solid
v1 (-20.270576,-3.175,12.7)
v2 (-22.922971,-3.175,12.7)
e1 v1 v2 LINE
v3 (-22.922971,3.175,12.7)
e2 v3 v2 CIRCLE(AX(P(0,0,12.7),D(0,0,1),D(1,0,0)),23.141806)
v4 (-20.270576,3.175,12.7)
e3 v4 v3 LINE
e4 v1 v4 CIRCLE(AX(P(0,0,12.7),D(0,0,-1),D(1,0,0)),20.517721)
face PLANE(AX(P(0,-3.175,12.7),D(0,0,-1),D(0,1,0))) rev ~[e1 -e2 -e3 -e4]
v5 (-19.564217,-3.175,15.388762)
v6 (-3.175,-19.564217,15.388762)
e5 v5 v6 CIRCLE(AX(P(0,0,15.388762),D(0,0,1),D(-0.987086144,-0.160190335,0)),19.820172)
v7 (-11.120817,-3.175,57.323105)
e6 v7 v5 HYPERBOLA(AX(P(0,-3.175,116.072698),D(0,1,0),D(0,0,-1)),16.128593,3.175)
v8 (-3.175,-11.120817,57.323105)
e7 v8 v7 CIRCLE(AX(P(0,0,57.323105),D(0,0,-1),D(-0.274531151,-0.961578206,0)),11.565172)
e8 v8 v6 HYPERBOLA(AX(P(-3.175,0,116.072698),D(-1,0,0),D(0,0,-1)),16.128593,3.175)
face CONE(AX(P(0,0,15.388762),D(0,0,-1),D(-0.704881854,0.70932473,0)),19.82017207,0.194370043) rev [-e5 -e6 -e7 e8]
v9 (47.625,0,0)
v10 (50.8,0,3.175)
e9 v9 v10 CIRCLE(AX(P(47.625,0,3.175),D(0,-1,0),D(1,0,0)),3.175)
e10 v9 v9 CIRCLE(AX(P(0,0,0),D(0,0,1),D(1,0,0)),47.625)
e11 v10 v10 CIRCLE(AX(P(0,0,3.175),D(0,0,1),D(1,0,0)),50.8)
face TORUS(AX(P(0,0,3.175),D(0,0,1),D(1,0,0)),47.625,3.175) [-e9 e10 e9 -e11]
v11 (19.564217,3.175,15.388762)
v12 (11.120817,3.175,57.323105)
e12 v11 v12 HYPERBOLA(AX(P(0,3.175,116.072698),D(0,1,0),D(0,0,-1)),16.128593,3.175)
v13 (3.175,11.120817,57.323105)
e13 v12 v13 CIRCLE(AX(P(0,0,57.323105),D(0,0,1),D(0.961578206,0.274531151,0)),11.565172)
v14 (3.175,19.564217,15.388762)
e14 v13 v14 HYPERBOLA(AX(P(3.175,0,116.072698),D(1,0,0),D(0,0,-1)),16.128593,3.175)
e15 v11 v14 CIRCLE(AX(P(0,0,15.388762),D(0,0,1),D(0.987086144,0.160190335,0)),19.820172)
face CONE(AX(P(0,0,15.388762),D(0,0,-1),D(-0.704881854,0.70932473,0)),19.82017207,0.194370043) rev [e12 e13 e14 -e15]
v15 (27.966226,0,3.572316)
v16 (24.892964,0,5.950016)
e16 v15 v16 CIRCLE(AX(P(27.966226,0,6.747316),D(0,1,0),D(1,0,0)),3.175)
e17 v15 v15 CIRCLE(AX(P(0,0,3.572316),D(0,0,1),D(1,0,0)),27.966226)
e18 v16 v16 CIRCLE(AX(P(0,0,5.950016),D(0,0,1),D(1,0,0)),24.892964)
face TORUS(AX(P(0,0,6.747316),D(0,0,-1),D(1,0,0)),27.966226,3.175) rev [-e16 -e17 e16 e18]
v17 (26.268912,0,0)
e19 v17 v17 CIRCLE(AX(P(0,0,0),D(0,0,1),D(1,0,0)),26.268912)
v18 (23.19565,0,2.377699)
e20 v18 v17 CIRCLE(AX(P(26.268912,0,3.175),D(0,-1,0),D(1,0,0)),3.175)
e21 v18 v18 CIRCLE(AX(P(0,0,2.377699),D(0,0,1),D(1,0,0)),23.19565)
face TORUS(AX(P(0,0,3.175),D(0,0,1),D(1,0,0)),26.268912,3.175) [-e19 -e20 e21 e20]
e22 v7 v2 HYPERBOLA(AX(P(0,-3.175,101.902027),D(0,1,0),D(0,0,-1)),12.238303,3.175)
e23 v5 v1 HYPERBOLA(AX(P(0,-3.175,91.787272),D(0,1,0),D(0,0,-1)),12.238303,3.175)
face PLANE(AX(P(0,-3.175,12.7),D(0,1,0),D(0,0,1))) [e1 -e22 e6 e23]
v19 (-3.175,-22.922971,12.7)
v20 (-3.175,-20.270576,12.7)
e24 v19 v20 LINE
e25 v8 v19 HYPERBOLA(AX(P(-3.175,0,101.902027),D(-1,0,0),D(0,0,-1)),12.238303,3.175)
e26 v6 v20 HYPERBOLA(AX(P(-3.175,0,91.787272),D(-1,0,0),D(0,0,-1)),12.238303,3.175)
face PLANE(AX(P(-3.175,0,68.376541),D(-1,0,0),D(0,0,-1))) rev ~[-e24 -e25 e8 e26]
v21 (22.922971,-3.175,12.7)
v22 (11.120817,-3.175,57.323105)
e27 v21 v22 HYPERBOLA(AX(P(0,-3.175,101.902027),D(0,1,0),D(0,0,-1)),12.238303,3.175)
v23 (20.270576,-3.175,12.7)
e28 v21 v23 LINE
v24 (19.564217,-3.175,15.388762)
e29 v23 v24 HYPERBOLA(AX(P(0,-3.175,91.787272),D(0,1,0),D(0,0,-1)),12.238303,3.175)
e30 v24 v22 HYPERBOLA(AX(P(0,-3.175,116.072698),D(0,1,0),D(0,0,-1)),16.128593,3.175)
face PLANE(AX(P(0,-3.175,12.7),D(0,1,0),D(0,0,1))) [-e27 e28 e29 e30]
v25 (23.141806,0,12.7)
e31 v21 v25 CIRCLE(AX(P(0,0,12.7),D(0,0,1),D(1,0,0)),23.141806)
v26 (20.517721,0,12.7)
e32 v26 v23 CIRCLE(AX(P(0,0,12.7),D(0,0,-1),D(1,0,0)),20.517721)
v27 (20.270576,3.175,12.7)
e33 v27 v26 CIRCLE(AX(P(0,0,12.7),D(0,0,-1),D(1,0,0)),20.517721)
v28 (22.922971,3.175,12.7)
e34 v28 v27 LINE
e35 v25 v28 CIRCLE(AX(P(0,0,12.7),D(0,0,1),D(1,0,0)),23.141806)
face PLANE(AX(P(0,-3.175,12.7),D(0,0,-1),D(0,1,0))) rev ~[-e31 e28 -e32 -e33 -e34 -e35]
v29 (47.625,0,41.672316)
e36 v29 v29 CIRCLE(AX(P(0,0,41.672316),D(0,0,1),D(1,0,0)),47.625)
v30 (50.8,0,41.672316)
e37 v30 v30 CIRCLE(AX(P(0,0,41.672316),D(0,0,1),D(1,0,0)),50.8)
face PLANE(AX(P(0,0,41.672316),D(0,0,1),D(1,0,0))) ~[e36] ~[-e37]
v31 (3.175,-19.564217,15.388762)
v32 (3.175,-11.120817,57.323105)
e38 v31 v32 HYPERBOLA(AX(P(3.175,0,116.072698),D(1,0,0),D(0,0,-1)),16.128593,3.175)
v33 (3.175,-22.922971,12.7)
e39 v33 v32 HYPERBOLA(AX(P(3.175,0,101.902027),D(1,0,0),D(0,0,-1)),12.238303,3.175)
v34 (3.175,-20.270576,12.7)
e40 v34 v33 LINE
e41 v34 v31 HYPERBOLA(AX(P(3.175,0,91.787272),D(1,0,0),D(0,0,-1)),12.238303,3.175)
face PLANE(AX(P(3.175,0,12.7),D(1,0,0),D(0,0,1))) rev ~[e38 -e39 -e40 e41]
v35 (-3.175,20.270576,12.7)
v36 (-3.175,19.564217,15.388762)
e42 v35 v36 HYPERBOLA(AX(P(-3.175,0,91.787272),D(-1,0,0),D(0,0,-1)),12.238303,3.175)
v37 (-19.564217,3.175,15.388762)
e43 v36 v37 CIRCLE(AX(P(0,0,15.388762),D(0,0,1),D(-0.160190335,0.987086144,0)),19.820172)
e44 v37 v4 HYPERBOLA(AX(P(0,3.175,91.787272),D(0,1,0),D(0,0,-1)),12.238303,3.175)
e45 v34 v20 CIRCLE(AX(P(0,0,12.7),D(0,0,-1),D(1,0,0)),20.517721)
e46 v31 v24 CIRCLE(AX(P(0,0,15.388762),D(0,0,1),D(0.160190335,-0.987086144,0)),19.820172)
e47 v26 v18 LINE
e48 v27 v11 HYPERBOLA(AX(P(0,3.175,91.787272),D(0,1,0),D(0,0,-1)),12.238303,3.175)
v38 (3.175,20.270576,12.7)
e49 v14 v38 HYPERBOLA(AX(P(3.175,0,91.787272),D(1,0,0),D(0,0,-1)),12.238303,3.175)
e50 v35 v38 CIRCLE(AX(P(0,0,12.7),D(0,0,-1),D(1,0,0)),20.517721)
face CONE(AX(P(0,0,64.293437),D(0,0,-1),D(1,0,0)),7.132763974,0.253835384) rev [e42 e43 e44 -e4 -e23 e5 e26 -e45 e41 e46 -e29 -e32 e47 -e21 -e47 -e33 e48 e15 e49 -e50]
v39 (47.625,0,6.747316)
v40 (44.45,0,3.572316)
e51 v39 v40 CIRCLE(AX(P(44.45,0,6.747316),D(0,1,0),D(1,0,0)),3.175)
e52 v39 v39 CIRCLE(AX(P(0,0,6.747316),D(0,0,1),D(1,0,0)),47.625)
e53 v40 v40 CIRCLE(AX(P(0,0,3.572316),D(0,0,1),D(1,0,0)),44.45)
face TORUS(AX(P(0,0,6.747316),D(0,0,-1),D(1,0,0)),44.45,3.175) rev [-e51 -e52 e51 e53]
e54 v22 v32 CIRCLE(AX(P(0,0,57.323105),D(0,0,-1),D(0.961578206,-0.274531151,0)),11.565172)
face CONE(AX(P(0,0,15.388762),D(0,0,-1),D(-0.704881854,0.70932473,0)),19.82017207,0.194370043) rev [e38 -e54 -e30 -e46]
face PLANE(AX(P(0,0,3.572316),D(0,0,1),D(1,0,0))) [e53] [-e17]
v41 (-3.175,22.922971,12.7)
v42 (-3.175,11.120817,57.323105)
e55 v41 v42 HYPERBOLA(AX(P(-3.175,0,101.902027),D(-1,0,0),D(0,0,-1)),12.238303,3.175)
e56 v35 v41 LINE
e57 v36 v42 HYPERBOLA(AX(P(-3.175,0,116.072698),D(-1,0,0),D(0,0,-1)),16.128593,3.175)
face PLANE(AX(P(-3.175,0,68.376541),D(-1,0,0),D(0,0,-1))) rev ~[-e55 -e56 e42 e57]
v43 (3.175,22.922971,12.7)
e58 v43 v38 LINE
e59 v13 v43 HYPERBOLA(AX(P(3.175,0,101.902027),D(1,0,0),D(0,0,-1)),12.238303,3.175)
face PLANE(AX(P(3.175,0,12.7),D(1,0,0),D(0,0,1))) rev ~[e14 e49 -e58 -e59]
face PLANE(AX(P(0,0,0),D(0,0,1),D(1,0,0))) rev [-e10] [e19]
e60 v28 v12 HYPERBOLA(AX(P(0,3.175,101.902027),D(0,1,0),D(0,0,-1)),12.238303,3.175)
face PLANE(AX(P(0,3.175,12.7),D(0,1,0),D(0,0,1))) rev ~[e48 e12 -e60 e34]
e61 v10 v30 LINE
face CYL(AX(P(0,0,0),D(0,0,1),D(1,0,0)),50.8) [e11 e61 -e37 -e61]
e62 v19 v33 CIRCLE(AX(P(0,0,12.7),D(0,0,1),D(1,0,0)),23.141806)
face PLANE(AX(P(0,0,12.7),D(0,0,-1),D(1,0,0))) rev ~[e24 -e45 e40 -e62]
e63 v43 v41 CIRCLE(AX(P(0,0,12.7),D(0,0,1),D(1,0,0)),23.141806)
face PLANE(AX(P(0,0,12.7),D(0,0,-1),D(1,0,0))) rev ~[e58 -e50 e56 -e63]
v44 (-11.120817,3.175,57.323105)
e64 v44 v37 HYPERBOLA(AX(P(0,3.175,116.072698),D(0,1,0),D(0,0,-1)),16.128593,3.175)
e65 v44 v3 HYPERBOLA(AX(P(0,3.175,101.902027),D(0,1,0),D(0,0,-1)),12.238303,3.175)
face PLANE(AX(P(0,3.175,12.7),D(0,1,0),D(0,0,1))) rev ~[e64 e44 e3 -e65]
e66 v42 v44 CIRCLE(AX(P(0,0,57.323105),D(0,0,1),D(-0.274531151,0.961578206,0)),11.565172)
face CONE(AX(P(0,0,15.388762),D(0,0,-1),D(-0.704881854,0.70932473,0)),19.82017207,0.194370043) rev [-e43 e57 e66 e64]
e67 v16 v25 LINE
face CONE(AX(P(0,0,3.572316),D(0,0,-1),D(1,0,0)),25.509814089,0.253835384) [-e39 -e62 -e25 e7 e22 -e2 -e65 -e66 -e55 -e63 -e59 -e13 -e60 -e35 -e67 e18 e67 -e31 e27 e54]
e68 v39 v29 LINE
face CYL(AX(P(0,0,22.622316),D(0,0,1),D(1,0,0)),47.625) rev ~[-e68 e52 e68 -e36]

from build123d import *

# Parameters (mm, degrees)
F0_W         = 3.175
F0_H         = 38.1
F3_R         = 3.175
F4_W         = 3.175
F4_H         = 55.6163180947
F5_DEPTH     = 30.734
F6_W         = 3.175
F6_H         = 64.323036778
F7_DEPTH     = 27.178
F8_R         = 11.5282463958
F9_DEPTH     = 72.136
F10_T2_ANGLE = 359.64
F10_T4_ANGLE = 359.64
F10_T6_ANGLE = 359.64
F10_T8_ANGLE = 359.64


# Not quite as in the source:
# - a fillet or chamfer that OpenCascade refuses, or shapes differently, is made with other operations: its cross-section is extruded or revolved along the edge and cut away or added


with BuildPart() as f2:
    # F0 (on Front) → F2 (revolve)
    with BuildSketch(Plane.XZ):
        Polygon((7.1327639744, 64.2934367061), (23.8125, 0), (23.8125, 3.5723163746), (25.5098140885, 3.5723163746), (9.5913732515, 64.9312771426), align=None)
        Polygon((23.8125, 3.5723163746), (23.8125, 0), (50.8, 0), (50.8, 3.5723163746), (47.625, 3.5723163746), (25.5098140885, 3.5723163746), align=None)
        with Locations((49.2125, 22.6223163746)):
            Rectangle(F0_W, F0_H)
    revolve(axis=Axis((0, 0, 38.2007025182), (0, 0, 1)))

    # F3
    f3_edges = [f2.edges().sort_by_distance(p)[0] for p in [
        (-50.8, 0, 0),
        (-23.8125, 0, 0),
        (-25.509814, 0, 3.572316),
        (-47.625, 0, 3.572316),
    ]]
    fillet(f3_edges, radius=F3_R)

    # F4 (on Front) → F5 (cut, symmetric)
    with BuildSketch(Plane.XZ):
        with Locations((1.5875, 40.5081590474)):
            Rectangle(F4_W, F4_H)
        Polygon((-3.175, 12.7), (0, 12.7), (0, 68.3163180947), (0, 68.3765411377), (-3.175, 68.3765411377), align=None)
    extrude(amount=F5_DEPTH, both=True, mode=Mode.SUBTRACT)

    # F6 (on Right) → F7 (cut, symmetric)
    with BuildSketch(Plane.YZ):
        Polygon((0, 77.023036778), (0, 12.7), (3.175, 12.7), (3.175, 80.2117586136), (0, 80.2117586136), align=None)
        with Locations((-1.5875, 44.861518389)):
            Rectangle(F6_W, F6_H)
    extrude(amount=F7_DEPTH, both=True, mode=Mode.SUBTRACT)

    # F8 (on Top) → F9 (cut)
    with BuildSketch(Plane.XY):
        Circle(F8_R)
    extrude(amount=F9_DEPTH, mode=Mode.SUBTRACT)

    # F10: chamfer of 10.16 x 33.02 on 4 edges, made by hand

    # F10_s1 → F10_t2 (revolve, cut)
    with BuildSketch(Plane(origin=(0, 0, 0), x_dir=(0, 0, 1), z_dir=(-0.7093247296, -0.7048818539, 0))):
        Polygon((15.3887617085, 19.8201720703), (57.5106823112, 11.5282463958), (47.3506823112, 11.5282463958), align=None)
    revolve(axis=Axis((0, 0, 47.3506823112), (0, 0, -1)), revolution_arc=F10_T2_ANGLE, mode=Mode.SUBTRACT)

    # F10_s3 → F10_t4 (revolve, cut)
    with BuildSketch(Plane(origin=(0, 0, 0), x_dir=(0, 0, 1), z_dir=(-0.7048818539, 0.7093247296, 0))):
        Polygon((15.3887617085, 19.8201720703), (57.5106823112, 11.5282463958), (47.3506823112, 11.5282463958), align=None)
    revolve(axis=Axis((0, 0, 47.3506823112), (0, 0, -1)), revolution_arc=F10_T4_ANGLE, mode=Mode.SUBTRACT)

    # F10_s5 → F10_t6 (revolve, cut)
    with BuildSketch(Plane(origin=(0, 0, 0), x_dir=(0, 0, 1), z_dir=(0.7093247296, 0.7048818539, 0))):
        Polygon((15.3887617085, 19.8201720703), (57.5106823112, 11.5282463958), (47.3506823112, 11.5282463958), align=None)
    revolve(axis=Axis((0, 0, 47.3506823112), (0, 0, -1)), revolution_arc=F10_T6_ANGLE, mode=Mode.SUBTRACT)

    # F10_s7 → F10_t8 (revolve, cut)
    with BuildSketch(Plane(origin=(0, 0, 0), x_dir=(0, 0, 1), z_dir=(0.7048818539, -0.7093247296, 0))):
        Polygon((15.3887617085, 19.8201720703), (57.5106823112, 11.5282463958), (47.3506823112, 11.5282463958), align=None)
    revolve(axis=Axis((0, 0, 47.3506823112), (0, 0, -1)), revolution_arc=F10_T8_ANGLE, mode=Mode.SUBTRACT)


solid = f2.part
